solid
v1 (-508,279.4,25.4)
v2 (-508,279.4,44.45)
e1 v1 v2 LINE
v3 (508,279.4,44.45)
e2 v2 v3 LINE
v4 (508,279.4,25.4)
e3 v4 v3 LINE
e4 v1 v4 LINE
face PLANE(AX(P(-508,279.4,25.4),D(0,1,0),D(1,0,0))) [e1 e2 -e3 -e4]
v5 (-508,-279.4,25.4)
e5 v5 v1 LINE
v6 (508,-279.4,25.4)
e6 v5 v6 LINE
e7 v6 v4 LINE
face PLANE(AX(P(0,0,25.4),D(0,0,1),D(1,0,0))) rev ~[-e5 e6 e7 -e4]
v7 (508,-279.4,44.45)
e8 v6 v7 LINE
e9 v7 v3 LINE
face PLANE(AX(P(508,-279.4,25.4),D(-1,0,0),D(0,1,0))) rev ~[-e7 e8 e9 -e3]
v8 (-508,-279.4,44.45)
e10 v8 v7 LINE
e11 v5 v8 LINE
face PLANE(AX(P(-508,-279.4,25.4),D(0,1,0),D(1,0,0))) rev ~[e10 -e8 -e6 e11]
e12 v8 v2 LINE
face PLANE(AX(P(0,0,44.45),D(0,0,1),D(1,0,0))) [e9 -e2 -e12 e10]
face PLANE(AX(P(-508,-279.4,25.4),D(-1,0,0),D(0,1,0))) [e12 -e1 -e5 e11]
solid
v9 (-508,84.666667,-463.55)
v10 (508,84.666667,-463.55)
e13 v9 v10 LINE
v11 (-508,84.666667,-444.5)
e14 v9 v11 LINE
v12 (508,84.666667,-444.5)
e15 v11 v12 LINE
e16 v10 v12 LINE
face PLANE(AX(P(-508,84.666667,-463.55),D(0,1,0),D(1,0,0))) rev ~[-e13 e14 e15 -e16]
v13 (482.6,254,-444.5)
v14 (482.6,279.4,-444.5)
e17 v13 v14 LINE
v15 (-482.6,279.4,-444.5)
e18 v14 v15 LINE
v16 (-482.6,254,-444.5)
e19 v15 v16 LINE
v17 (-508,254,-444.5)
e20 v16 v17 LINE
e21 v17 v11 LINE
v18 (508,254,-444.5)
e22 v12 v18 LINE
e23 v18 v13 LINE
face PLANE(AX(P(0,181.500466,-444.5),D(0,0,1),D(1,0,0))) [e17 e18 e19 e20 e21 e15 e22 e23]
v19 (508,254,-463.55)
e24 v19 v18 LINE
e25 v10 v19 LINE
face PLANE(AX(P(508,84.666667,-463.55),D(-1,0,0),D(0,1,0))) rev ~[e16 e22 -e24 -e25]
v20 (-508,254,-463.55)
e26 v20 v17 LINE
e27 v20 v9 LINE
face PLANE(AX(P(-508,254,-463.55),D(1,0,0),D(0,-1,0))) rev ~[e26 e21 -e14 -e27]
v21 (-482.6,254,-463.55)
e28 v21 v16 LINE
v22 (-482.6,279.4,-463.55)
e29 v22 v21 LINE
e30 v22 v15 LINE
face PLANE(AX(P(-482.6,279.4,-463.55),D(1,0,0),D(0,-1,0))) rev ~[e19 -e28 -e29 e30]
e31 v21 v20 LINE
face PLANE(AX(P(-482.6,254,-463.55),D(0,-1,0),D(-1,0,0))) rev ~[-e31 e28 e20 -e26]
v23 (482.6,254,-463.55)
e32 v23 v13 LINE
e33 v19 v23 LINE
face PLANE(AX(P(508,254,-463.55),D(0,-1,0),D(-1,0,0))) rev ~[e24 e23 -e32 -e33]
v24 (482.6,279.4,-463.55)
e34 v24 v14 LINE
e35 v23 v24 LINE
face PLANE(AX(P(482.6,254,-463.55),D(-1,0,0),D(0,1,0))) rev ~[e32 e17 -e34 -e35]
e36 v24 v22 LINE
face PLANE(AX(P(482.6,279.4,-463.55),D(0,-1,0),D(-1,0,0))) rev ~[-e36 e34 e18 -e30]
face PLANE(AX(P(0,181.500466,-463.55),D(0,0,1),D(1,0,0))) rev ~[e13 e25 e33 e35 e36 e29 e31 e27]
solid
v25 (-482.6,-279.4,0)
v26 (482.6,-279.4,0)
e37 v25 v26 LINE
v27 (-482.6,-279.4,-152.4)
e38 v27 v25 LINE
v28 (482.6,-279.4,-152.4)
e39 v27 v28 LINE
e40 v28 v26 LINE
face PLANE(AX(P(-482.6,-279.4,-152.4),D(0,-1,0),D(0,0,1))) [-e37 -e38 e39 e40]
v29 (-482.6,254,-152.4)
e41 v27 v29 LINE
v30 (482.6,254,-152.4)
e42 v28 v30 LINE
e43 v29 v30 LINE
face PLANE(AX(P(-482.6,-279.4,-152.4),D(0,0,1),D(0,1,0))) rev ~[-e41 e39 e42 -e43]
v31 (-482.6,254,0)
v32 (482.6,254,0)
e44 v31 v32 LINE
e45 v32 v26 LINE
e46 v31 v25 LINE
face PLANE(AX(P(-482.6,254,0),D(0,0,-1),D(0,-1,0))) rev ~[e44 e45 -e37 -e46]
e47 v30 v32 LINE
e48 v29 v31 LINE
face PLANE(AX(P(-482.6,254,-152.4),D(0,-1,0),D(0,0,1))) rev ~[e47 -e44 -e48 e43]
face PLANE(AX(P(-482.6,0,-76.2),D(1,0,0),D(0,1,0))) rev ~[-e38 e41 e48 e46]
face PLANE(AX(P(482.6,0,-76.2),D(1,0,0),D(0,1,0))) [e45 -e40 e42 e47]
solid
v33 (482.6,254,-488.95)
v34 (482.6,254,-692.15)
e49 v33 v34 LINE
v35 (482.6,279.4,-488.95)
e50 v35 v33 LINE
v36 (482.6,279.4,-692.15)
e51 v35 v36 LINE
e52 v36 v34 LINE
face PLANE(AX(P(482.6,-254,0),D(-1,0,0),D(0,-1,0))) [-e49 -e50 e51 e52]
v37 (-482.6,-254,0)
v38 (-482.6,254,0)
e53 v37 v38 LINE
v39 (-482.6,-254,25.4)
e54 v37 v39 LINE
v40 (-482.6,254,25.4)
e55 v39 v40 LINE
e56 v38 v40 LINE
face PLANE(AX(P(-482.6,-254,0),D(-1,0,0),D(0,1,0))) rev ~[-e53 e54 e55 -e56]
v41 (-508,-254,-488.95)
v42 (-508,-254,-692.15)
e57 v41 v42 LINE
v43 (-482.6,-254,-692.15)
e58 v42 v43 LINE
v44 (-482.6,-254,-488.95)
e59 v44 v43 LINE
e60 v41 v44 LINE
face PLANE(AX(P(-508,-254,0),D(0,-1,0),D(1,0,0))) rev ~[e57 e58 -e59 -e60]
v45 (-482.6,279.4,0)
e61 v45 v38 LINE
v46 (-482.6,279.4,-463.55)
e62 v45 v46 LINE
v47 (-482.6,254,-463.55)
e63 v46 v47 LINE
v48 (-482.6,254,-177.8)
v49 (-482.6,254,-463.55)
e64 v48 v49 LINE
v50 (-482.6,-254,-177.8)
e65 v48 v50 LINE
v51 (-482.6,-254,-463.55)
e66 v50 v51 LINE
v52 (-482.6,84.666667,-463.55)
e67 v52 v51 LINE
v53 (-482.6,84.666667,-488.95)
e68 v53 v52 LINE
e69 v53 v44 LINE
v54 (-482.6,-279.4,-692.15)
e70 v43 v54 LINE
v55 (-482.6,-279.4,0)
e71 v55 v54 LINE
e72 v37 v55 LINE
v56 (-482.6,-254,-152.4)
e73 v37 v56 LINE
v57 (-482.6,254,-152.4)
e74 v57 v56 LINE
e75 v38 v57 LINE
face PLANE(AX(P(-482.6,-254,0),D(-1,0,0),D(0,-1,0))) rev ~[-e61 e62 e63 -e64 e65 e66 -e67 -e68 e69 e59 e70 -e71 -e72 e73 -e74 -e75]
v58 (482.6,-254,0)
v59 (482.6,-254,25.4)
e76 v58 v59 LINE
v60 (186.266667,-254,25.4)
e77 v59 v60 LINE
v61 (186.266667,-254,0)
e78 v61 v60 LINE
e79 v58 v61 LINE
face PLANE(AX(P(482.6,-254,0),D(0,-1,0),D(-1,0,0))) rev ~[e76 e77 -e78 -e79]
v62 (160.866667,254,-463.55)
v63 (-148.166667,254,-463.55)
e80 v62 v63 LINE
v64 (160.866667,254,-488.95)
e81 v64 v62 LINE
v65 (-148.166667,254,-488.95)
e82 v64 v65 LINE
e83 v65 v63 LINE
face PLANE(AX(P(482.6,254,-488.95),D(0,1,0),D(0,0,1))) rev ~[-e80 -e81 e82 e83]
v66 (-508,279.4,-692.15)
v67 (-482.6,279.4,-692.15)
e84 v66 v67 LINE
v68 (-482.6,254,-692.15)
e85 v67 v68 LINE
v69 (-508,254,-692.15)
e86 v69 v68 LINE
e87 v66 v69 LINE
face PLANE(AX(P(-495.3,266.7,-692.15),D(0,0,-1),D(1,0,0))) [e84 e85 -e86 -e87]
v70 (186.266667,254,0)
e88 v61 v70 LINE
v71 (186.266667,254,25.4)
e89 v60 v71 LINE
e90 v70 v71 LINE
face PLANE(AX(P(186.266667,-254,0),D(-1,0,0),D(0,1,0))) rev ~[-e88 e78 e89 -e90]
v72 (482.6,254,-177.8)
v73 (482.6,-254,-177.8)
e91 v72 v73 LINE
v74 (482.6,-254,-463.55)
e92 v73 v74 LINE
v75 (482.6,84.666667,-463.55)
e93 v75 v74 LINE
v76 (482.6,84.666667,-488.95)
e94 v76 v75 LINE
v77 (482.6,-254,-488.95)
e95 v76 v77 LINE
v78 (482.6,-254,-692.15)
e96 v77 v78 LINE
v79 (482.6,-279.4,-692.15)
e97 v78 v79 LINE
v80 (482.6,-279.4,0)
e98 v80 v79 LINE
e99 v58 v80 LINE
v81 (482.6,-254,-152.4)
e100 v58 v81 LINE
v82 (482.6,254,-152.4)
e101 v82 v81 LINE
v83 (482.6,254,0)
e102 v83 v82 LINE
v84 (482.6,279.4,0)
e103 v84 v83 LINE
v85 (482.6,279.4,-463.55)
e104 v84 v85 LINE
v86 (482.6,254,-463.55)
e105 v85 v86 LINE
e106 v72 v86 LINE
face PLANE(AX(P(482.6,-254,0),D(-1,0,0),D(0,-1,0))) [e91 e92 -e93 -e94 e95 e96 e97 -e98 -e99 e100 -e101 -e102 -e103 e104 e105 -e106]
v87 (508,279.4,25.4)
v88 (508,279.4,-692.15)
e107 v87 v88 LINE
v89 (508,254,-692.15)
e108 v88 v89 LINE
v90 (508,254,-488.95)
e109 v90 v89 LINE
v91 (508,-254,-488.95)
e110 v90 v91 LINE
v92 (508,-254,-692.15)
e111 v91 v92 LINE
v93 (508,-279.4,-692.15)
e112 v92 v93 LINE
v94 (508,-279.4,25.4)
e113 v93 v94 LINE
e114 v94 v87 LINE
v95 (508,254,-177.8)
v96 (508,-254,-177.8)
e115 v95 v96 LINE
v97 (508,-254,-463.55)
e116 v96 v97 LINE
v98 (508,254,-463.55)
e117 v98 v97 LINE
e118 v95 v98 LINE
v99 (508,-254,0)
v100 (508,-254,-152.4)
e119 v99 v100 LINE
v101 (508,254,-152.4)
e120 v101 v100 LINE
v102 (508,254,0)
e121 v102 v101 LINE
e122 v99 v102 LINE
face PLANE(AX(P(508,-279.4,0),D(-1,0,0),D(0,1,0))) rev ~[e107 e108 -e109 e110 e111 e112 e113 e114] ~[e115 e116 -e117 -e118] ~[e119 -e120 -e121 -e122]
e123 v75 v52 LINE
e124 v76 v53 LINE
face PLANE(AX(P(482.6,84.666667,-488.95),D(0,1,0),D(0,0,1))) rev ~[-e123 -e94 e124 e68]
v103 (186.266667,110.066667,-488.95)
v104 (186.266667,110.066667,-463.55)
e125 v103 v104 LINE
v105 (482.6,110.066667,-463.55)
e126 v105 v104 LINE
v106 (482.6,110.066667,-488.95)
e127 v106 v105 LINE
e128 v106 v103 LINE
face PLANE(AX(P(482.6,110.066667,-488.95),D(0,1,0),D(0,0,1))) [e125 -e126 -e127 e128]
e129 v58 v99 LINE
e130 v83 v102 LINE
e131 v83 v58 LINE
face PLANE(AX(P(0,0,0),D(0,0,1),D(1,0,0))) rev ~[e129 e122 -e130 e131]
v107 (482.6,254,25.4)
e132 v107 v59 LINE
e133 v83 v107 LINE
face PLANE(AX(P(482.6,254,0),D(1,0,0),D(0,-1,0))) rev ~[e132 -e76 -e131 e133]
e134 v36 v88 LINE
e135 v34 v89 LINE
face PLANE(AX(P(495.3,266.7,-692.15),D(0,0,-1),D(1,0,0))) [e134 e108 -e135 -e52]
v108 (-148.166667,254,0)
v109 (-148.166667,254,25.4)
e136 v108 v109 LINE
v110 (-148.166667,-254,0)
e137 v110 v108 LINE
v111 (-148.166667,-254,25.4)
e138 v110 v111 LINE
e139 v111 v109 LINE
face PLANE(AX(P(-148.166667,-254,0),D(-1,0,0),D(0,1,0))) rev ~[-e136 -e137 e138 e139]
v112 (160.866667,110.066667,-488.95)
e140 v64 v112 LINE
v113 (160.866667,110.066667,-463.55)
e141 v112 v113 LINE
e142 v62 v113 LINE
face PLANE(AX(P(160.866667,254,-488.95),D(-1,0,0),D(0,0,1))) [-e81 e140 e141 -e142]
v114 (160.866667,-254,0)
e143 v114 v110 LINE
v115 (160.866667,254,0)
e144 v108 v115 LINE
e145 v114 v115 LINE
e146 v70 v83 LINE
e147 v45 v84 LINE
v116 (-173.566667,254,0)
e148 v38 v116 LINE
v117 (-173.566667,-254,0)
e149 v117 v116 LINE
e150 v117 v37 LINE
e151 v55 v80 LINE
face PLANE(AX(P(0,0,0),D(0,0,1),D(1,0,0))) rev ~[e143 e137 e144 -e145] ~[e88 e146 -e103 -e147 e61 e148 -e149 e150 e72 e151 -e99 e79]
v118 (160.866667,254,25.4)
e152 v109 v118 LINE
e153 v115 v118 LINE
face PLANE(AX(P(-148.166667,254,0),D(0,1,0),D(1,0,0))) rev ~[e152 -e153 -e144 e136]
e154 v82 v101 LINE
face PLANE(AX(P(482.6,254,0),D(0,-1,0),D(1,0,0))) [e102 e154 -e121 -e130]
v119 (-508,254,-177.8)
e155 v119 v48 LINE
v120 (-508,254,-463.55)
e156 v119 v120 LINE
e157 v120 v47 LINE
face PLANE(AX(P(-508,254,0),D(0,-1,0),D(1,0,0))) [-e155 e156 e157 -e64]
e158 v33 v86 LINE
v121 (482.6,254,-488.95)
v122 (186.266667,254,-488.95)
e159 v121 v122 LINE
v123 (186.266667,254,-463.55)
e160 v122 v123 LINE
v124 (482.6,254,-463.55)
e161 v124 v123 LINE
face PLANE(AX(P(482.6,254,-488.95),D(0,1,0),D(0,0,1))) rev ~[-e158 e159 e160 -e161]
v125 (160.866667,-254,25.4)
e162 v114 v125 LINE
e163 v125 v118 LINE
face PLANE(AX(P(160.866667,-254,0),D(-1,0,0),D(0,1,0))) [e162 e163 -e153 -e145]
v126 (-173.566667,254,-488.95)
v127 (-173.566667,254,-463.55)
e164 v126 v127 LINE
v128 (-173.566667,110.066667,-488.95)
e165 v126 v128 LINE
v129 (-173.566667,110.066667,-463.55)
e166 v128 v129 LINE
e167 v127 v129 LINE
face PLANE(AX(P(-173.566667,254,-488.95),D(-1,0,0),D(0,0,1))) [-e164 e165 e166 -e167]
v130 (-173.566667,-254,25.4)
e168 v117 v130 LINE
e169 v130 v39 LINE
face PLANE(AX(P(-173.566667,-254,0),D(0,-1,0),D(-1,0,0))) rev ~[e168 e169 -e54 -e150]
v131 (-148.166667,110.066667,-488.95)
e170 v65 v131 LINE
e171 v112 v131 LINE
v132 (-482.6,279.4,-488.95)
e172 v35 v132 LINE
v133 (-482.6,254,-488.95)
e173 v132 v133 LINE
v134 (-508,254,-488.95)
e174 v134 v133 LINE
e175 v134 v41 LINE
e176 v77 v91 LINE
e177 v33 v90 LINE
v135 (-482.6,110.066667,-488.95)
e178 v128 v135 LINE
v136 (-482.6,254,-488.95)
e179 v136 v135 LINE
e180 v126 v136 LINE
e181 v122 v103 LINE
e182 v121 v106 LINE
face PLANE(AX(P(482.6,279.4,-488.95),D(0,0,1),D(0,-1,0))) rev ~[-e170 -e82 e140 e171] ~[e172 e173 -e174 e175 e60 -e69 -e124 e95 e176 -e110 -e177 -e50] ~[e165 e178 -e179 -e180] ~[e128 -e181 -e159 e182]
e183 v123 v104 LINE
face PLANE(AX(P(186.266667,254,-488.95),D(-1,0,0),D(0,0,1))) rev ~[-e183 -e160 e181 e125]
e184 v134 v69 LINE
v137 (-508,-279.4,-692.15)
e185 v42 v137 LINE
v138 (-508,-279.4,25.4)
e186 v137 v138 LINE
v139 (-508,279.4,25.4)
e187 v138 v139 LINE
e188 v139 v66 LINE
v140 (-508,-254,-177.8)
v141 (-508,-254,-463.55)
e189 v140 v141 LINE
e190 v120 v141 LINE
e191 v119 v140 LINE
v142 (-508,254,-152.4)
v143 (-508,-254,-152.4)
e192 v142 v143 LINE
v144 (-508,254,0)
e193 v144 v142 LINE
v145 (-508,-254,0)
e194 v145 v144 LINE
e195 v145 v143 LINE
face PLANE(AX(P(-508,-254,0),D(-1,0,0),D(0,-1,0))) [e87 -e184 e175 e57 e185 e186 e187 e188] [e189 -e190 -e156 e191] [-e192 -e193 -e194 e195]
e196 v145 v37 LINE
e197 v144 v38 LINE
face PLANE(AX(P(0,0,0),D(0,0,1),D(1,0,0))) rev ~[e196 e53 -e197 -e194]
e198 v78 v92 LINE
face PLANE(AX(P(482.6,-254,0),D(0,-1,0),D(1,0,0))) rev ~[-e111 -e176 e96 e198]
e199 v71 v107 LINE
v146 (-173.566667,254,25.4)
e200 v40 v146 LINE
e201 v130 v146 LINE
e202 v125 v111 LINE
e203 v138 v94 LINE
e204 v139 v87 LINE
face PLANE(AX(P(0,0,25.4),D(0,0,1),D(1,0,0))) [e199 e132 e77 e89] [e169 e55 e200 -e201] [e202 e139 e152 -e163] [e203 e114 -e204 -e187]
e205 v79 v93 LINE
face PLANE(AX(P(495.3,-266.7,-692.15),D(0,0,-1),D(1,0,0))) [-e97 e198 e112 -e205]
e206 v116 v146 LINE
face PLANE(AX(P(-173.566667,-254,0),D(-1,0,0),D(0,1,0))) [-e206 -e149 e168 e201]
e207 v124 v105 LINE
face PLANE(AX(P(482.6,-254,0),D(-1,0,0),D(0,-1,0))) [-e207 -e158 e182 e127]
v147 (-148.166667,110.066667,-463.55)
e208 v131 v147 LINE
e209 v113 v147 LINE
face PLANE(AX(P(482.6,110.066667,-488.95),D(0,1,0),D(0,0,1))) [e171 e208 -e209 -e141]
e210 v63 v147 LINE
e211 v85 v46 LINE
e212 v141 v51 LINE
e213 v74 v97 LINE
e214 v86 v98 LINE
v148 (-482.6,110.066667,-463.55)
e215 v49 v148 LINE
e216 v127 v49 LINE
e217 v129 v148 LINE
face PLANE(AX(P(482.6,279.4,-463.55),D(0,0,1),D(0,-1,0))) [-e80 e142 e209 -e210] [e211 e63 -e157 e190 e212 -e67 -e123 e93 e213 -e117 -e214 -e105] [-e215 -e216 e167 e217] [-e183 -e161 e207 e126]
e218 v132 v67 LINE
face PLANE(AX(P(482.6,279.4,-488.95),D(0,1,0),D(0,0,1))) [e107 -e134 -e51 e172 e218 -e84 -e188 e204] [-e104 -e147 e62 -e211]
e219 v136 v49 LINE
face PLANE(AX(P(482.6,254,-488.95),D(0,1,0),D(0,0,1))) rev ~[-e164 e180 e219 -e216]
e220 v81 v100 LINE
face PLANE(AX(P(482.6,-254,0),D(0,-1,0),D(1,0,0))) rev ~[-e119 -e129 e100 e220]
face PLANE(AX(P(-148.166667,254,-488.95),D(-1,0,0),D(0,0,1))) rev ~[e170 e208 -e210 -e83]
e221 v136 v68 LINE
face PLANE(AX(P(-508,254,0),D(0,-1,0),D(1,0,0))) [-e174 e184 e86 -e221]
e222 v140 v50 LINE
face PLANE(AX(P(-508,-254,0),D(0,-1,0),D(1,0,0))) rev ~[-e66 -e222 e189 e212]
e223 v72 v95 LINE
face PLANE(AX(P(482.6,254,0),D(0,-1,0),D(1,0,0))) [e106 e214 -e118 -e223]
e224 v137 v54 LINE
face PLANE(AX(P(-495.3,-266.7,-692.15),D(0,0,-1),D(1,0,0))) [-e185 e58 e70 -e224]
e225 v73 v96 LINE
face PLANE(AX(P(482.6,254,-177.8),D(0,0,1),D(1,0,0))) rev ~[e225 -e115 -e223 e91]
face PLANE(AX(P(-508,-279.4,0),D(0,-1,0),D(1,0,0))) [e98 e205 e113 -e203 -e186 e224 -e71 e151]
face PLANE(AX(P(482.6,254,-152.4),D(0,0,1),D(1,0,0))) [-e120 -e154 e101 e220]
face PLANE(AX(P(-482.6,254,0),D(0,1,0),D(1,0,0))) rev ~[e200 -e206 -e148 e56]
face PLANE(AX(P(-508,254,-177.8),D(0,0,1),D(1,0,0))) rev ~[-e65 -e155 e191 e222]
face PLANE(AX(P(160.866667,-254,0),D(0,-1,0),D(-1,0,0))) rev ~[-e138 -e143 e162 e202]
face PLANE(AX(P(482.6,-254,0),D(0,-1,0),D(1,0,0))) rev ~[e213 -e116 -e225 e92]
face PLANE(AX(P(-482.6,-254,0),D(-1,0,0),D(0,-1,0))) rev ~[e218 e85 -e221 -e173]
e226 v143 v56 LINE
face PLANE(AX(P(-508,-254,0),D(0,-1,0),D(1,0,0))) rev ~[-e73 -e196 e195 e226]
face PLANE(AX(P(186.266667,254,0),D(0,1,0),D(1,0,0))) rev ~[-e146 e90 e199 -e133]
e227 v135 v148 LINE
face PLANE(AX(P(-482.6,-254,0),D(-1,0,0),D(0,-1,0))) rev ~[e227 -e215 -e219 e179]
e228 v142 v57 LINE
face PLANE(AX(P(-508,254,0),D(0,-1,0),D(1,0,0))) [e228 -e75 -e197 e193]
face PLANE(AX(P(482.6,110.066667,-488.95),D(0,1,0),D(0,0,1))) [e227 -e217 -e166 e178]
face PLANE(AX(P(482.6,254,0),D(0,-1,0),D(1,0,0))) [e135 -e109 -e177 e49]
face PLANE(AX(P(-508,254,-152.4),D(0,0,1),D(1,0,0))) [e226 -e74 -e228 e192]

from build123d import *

# Parameters (mm, degrees)
F4_W      = 1016
F4_H      = 558.8
F4_W_2    = 25.4
F4_H_2    = 508
F5_DEPTH  = 25.4
F6_W      = 1016
F6_H      = 558.8
F7_DEPTH  = 19.05
F8_W      = 25.4
F8_H      = 25.4
F9_DEPTH  = 692.15
F10_W     = 25.4
F10_H     = 25.4
F11_DEPTH = 508
F12_W     = 25.4
F12_H     = 25.4
F13_DEPTH = 508
F14_W     = 25.4
F14_H     = 25.4
F15_DEPTH = 965.2
F16_W     = 25.4
F16_H     = 25.4
F17_DEPTH = 143.9333333333
F19_DEPTH = 19.05
F20_W     = 25.4
F20_H     = 25.4
F21_DEPTH = 508
F22_W     = 25.4
F22_H     = 25.4
F23_DEPTH = 508
F24_W     = 508
F24_H     = 152.4
F24_W_2   = 25.4
F25_DEPTH = 965.2


# Not quite as in the source:
# - a length typed as a fraction of an inch, garbled in the dataset ("3 / 203.2 mm" for 3/8 in), is restored


with BuildPart() as f5:
    # F4 (on Top) → F5 (new body)
    with BuildSketch(Plane.XY):
        Rectangle(F4_W, F4_H)
        Polygon((482.6, 254), (482.6, -254), (186.2666666667, -254), (160.8666666667, -254), (-148.1666666667, -254), (-173.5666666667, -254), (-482.6, -254), (-482.6, 254), (-173.5666666667, 254), (-148.1666666667, 254), (160.8666666667, 254), (186.2666666667, 254), align=None, mode=Mode.SUBTRACT)
        with Locations((-160.8666666667, 0)):
            Rectangle(F4_W_2, F4_H_2)
        with Locations((173.5666666667, 0)):
            Rectangle(F4_W_2, F4_H_2)
    extrude(amount=F5_DEPTH)

    # F8 (on face) → F9 (join)
    with BuildSketch(Plane(origin=(0, 0, 0), x_dir=(1, 0, 0), z_dir=(0, 0, -1))):
        with Locations((-495.3, 266.7)):
            Rectangle(F8_W, F8_H)
        with Locations((-495.3, -266.7)):
            Rectangle(F8_W, F8_H)
        with Locations((495.3, 266.7)):
            Rectangle(F8_W, F8_H)
        with Locations((495.3, -266.7)):
            Rectangle(F8_W, F8_H)
    extrude(amount=F9_DEPTH)

    # F10 (on face) → F11 (join, through all)
    with BuildSketch(Plane.XZ.offset(-254)):
        with Locations((-495.3, -476.25)):
            Rectangle(F10_W, F10_H)
    extrude(amount=F11_DEPTH)

    # F12 (on face) → F13 (join, through all)
    with BuildSketch(Plane.XZ.offset(-254)):
        with Locations((495.3, -476.25)):
            Rectangle(F12_W, F12_H)
    extrude(amount=F13_DEPTH)

    # F14 (on face) → F15 (join, through all)
    with BuildSketch(Plane(origin=(482.6, 0, 0), x_dir=(0, -1, 0), z_dir=(-1, 0, 0))):
        with Locations((-97.3666666667, -476.25)):
            Rectangle(F14_W, F14_H)
        with Locations((-266.7, -476.25)):
            Rectangle(F14_W, F14_H)
    extrude(amount=F15_DEPTH)

    # F16 (on face) → F17 (join, through all)
    with BuildSketch(Plane.XZ.offset(-254)):
        with Locations((-160.8666666667, -476.25)):
            Rectangle(F16_W, F16_H)
        with Locations((173.5666666667, -476.25)):
            Rectangle(F16_W, F16_H)
    extrude(amount=F17_DEPTH)

    # F20 (on face) → F21 (join, through all)
    with BuildSketch(Plane.XZ.offset(-254)):
        with Locations((-495.3, -165.1)):
            Rectangle(F20_W, F20_H)
    extrude(amount=F21_DEPTH)

    # F22 (on face) → F23 (join, through all)
    with BuildSketch(Plane.XZ.offset(-254)):
        with Locations((495.3, -165.1)):
            Rectangle(F22_W, F22_H)
    extrude(amount=F23_DEPTH)


with BuildPart() as f7:
    # F6 (on face) → F7 (new body)
    with BuildSketch(Plane.XY.offset(25.4)):
        Rectangle(F6_W, F6_H)
    extrude(amount=F7_DEPTH)


with BuildPart() as f19:
    # F18 (on face) → F19 (new body)
    with BuildSketch(Plane.XY.offset(-463.55)):
        Polygon((-482.6, 254), (-508, 254), (-508, 84.6666666667), (508, 84.6666666667), (508, 254), (482.6, 254), (482.6, 279.4), (-482.6, 279.4), align=None)
    extrude(amount=F19_DEPTH)


with BuildPart() as f25:
    # F24 (on face) → F25 (new body)
    with BuildSketch(Plane.YZ.offset(-482.6)):
        with Locations((0, -76.2)):
            Rectangle(F24_W, F24_H)
        with Locations((-266.7, -76.2)):
            Rectangle(F24_W_2, F24_H)
    extrude(amount=F25_DEPTH)


solid = Compound([f5.part, f7.part, f19.part, f25.part])
